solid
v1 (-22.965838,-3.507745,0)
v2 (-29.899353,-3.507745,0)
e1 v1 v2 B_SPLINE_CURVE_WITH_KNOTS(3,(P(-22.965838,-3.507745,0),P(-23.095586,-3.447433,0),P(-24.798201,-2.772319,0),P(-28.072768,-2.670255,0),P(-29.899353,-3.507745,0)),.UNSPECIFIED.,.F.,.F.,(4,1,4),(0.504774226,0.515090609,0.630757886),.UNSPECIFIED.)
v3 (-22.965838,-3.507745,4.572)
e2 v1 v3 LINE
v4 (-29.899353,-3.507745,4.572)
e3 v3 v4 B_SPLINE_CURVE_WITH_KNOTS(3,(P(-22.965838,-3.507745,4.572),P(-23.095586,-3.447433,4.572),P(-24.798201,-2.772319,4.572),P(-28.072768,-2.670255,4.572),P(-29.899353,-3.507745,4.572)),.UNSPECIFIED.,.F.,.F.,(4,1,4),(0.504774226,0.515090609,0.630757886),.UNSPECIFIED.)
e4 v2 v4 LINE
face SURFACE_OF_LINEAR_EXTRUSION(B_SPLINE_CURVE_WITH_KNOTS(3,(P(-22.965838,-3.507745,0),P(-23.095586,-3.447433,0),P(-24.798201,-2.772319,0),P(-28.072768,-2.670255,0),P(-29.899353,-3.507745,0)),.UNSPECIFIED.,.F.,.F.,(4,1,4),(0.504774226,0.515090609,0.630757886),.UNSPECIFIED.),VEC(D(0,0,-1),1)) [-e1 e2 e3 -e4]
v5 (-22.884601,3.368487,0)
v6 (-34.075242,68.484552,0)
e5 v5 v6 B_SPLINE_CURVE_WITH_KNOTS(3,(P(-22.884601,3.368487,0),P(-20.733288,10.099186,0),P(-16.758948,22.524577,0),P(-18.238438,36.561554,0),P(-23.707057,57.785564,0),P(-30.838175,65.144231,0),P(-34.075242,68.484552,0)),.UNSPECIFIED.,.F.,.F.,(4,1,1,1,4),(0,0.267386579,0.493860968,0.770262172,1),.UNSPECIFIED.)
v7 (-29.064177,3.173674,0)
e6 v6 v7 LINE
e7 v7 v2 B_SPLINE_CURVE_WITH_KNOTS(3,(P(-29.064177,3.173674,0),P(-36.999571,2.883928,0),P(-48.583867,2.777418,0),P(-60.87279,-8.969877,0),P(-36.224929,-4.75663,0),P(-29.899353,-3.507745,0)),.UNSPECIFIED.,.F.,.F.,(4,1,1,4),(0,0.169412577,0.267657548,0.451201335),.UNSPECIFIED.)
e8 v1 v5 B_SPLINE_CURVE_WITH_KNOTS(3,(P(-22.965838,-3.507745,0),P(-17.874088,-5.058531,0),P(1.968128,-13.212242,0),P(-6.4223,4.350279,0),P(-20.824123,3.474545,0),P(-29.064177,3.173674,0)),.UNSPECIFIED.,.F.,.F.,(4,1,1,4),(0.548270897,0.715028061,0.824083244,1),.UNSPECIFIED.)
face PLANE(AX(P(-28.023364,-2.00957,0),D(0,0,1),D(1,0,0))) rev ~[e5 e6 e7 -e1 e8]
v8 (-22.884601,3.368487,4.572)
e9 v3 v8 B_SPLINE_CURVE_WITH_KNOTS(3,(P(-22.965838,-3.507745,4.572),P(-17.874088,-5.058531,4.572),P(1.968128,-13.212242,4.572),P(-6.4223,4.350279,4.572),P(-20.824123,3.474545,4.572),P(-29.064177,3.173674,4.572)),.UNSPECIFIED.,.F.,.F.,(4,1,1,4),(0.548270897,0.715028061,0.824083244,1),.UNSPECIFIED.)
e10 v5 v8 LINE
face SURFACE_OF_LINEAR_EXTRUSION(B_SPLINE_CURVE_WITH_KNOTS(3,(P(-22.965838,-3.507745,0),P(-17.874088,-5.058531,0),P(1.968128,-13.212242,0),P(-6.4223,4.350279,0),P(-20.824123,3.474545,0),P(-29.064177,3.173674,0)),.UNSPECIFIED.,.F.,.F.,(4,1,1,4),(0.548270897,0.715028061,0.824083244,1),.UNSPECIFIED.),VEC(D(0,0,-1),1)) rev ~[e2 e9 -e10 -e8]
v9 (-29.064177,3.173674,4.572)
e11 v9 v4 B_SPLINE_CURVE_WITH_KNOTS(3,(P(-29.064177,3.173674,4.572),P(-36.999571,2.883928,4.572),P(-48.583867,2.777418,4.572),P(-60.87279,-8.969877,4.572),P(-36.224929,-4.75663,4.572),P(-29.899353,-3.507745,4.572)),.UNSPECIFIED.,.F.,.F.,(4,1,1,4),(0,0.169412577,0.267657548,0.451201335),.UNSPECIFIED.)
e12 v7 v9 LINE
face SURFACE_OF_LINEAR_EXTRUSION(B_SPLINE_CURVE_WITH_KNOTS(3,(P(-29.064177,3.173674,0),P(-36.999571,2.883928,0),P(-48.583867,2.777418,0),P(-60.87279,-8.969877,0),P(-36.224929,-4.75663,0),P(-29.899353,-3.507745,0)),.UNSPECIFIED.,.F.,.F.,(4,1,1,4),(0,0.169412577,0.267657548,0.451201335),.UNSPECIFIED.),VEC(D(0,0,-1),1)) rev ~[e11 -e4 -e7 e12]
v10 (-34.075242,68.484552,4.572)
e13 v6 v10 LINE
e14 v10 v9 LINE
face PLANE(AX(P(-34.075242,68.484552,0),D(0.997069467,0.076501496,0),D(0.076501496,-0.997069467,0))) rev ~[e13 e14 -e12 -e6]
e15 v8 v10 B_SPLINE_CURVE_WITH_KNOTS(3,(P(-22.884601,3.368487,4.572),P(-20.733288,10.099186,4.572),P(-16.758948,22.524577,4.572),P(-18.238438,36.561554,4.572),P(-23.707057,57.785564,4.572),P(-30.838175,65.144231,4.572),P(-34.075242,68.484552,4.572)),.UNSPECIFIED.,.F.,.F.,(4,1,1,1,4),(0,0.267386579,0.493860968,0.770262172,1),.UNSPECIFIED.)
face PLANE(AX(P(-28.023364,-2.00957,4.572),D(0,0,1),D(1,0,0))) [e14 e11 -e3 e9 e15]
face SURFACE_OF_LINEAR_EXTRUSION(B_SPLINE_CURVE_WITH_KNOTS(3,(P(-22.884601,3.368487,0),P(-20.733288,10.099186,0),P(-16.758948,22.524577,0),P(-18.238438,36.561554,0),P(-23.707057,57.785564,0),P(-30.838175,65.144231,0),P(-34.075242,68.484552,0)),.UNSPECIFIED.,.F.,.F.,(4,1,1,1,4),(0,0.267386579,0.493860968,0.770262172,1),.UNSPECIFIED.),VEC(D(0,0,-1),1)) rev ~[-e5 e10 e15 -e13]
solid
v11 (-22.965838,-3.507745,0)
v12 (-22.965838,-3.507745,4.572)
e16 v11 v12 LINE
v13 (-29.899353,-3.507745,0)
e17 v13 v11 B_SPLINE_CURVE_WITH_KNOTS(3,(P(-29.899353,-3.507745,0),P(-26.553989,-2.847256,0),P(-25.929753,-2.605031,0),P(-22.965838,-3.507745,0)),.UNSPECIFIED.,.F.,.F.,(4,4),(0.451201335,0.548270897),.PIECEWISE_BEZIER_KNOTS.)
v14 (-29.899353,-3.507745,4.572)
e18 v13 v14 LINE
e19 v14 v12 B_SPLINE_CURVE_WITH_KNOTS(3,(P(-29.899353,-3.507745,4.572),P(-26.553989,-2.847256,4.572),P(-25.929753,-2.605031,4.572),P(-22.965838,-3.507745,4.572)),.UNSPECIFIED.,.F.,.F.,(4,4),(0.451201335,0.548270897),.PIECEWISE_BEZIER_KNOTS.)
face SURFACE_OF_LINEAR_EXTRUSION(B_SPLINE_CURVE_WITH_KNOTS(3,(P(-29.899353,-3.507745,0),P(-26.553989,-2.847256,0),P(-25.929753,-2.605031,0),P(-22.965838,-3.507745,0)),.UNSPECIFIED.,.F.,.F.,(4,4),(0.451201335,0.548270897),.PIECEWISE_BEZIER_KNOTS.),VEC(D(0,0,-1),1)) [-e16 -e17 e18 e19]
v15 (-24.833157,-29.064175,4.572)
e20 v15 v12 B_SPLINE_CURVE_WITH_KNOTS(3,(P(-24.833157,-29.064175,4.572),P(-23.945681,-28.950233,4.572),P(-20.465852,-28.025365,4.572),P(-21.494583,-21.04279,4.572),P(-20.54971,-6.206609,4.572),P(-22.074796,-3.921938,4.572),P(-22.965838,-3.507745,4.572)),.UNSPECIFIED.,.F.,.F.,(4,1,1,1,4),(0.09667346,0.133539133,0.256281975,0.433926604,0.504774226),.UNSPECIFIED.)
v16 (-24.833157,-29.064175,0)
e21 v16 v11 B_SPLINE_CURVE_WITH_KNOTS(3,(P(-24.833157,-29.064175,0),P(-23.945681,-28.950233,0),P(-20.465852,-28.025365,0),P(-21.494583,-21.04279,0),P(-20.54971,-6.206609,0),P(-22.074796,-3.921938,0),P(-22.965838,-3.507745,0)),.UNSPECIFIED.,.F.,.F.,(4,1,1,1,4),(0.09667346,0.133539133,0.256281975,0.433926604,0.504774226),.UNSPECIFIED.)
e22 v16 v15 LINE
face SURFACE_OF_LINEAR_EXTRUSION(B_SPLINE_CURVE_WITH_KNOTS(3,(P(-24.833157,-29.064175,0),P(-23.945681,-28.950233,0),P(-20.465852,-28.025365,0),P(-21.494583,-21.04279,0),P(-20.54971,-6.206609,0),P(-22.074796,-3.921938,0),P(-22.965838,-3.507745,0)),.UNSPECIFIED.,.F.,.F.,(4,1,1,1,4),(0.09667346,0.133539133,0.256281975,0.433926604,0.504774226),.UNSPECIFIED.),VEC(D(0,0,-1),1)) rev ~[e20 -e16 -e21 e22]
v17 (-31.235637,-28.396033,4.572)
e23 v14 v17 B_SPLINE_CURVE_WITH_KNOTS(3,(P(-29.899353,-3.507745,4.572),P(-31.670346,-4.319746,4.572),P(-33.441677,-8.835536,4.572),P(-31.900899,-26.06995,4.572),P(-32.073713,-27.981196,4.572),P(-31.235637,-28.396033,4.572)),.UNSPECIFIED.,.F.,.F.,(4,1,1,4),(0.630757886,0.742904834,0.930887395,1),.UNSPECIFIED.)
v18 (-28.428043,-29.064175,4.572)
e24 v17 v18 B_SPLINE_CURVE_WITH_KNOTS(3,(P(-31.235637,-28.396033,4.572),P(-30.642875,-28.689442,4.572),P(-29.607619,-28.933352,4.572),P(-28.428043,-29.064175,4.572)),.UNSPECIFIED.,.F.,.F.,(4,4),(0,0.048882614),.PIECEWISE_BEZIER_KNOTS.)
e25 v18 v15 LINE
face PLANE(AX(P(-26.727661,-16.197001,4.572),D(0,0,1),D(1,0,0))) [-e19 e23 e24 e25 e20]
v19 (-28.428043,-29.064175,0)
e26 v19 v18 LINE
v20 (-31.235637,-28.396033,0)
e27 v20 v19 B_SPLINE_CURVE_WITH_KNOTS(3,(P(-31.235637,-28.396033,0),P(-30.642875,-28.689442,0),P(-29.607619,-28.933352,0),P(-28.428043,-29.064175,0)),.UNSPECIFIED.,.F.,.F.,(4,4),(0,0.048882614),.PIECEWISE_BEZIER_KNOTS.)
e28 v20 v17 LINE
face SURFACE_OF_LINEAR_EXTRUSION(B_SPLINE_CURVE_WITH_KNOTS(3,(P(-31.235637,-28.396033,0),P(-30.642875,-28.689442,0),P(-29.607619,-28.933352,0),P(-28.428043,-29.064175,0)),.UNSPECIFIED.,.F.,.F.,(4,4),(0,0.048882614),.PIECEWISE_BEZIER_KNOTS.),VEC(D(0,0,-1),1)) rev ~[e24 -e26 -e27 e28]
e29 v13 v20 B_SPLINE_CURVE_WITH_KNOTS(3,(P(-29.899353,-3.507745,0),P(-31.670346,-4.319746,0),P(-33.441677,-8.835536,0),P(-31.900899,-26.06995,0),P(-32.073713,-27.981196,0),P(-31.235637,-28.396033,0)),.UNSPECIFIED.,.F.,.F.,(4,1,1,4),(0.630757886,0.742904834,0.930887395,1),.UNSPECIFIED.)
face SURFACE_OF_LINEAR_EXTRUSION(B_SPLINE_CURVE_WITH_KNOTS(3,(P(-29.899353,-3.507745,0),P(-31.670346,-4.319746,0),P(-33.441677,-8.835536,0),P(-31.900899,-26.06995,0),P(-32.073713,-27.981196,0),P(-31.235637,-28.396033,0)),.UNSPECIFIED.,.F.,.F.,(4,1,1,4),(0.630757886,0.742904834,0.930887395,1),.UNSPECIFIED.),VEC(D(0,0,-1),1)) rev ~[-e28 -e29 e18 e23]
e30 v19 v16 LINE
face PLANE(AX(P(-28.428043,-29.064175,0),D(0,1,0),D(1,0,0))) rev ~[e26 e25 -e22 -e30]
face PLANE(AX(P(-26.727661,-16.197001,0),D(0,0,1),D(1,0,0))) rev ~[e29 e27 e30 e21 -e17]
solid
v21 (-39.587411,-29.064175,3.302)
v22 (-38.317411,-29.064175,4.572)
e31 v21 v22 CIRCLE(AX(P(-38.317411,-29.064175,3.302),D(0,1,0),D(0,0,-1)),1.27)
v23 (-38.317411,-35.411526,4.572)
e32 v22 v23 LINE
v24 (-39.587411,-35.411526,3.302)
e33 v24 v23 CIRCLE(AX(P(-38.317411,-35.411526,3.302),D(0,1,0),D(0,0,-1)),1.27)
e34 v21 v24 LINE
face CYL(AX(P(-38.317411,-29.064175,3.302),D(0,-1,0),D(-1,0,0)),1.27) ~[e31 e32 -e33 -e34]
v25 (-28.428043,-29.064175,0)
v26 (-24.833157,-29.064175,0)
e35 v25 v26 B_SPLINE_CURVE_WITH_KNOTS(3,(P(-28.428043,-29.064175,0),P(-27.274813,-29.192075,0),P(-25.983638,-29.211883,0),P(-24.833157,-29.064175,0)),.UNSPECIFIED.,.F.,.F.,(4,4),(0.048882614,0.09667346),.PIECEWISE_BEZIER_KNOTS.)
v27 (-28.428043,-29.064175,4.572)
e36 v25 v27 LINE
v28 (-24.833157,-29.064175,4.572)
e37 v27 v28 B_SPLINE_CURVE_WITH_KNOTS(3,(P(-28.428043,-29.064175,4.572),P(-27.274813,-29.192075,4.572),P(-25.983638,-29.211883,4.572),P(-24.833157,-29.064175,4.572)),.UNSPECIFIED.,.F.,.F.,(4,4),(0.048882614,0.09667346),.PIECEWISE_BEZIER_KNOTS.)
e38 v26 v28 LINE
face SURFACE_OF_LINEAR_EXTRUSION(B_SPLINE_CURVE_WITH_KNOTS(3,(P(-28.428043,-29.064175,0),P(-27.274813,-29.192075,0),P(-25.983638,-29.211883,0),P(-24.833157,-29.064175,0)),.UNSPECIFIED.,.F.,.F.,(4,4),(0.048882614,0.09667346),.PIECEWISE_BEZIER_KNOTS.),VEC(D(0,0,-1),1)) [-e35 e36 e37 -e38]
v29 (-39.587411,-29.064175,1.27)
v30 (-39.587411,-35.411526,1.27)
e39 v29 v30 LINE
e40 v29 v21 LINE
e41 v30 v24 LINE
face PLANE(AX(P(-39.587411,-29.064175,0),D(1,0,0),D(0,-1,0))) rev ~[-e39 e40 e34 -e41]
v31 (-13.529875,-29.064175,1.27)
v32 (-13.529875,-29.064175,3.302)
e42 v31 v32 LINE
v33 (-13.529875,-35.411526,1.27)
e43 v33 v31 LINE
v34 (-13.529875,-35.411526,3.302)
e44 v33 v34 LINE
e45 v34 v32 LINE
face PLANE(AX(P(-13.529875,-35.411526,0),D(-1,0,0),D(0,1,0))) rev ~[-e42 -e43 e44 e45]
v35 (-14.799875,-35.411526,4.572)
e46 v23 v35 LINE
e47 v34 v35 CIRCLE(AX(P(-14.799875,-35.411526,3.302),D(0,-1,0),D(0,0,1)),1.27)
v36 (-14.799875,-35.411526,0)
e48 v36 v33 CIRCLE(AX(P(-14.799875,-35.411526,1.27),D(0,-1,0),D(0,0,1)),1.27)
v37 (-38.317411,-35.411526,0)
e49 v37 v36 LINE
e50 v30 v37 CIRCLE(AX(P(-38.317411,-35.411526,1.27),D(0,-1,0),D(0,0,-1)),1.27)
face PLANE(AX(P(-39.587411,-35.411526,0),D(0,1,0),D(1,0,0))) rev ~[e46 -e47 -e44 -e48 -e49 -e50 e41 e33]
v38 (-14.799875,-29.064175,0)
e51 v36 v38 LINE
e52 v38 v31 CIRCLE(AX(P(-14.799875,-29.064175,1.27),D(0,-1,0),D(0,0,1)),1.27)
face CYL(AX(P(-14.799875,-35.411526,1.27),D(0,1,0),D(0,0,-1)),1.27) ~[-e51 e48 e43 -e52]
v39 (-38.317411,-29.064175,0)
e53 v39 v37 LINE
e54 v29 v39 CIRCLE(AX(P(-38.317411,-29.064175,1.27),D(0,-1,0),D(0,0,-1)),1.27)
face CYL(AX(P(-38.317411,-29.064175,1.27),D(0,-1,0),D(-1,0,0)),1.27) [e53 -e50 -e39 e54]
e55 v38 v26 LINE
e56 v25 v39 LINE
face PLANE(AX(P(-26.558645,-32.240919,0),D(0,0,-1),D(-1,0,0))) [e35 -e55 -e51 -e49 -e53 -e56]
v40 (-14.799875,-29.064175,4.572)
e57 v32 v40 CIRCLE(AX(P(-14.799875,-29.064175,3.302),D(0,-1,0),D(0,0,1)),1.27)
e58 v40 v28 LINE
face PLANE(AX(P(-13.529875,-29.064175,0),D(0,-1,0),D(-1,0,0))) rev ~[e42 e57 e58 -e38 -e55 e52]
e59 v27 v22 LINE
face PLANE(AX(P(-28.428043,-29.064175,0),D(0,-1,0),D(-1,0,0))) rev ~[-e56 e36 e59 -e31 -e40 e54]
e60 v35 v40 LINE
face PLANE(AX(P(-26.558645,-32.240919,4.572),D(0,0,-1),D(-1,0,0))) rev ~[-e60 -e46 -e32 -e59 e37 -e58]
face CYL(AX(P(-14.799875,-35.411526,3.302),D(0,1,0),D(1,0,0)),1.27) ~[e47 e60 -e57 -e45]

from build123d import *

# Parameters (mm, degrees)
F1_DEPTH = 4.572
F2_R     = 1.27
F3_R     = 1.27
F4_R     = 1.27
F5_R     = 1.27


with BuildPart() as f1:
    # F0 (on Top) → F1 (new body)
    with BuildSketch(Plane.XY):
        with BuildLine():
            add(Edge.make_bspline(
                [(-29.8993531615, -3.5077452194), (-31.6703462632, -4.3197464152), (-33.4416768807, -8.8355358115), (-31.9008991214, -26.0699501287), (-32.073712776, -27.9811963987), (-31.2356371433, -28.3960327506)],
                knots=[0.6307578864, 0.6307578864, 0.6307578864, 0.6307578864, 0.7429048342, 0.9308873949, 1, 1, 1, 1], degree=3))
            add(Edge.make_bspline(
                [(-31.2356371433, -28.3960327506), (-30.6428751172, -28.6894421123), (-29.6076188044, -28.9333524282), (-28.4280432172, -29.0641747415)],
                knots=[0, 0, 0, 0, 0.0488826142, 0.0488826142, 0.0488826142, 0.0488826142], degree=3))
            Line((-28.4280432172, -29.0641747415), (-24.8331572694, -29.0641747415))
            add(Edge.make_bspline(
                [(-24.8331572694, -29.0641747415), (-23.9456810218, -28.9502333326), (-20.4658515137, -28.0253654937), (-21.4945827069, -21.0427899664), (-20.5497100233, -6.2066091766), (-22.0747955225, -3.9219376818), (-22.9658381019, -3.5077452194)],
                knots=[0.0966734598, 0.0966734598, 0.0966734598, 0.0966734598, 0.1335391331, 0.2562819752, 0.4339266036, 0.5047742263, 0.5047742263, 0.5047742263, 0.5047742263], degree=3))
            add(Edge.make_bspline(
                [(-29.8993531615, -3.5077452194), (-26.5539886397, -2.8472558093), (-25.9297526703, -2.6050307792), (-22.9658381019, -3.5077452194)],
                knots=[0.4512013353, 0.4512013353, 0.4512013353, 0.4512013353, 0.548270897, 0.548270897, 0.548270897, 0.548270897], degree=3))
        make_face()
    extrude(amount=F1_DEPTH)


with BuildPart() as f1b:
    # F0 (on Top) → F1, piece 2 (new body)
    with BuildSketch(Plane.XY):
        with BuildLine():
            add(Edge.make_bspline(
                [(-28.4280432172, -29.0641747415), (-27.2748128564, -29.1920752043), (-25.9836378271, -29.2118827799), (-24.8331572694, -29.0641747415)],
                knots=[0.0488826142, 0.0488826142, 0.0488826142, 0.0488826142, 0.0966734598, 0.0966734598, 0.0966734598, 0.0966734598], degree=3))
            Line((-28.4280432172, -29.0641747415), (-39.5874110982, -29.0641747415))
            Line((-39.5874110982, -29.0641747415), (-39.5874110982, -35.4115255177))
            Line((-39.5874110982, -35.4115255177), (-13.5298753157, -35.4115255177))
            Line((-13.5298753157, -35.4115255177), (-13.5298753157, -29.0641747415))
            Line((-13.5298753157, -29.0641747415), (-24.8331572694, -29.0641747415))
        make_face()
    extrude(amount=F1_DEPTH)

    # F2
    f2_edges = [f1b.edges().sort_by_distance(p)[0] for p in [
        (-39.587411, -32.23785, 4.572),
    ]]
    fillet(f2_edges, radius=F2_R)

    # F3
    f3_edges = [f1b.edges().sort_by_distance(p)[0] for p in [
        (-39.587411, -32.23785, 0),
    ]]
    fillet(f3_edges, radius=F3_R)

    # F4
    f4_edges = [f1b.edges().sort_by_distance(p)[0] for p in [
        (-13.529875, -32.23785, 0),
    ]]
    fillet(f4_edges, radius=F4_R)

    # F5
    f5_edges = [f1b.edges().sort_by_distance(p)[0] for p in [
        (-13.529875, -32.23785, 4.572),
    ]]
    fillet(f5_edges, radius=F5_R)


with BuildPart() as f1c:
    # F0 (on Top) → F1, piece 3 (new body)
    with BuildSketch(Plane.XY):
        with BuildLine():
            add(Edge.make_bspline(
                [(-29.0641766042, 3.1736744568), (-36.9995706334, 2.8839279058), (-48.5838670621, 2.7774177029), (-60.872789795, -8.9698768638), (-36.2249289881, -4.7566303017), (-29.8993531615, -3.5077452194)],
                knots=[0, 0, 0, 0, 0.1694125769, 0.2676575484, 0.4512013353, 0.4512013353, 0.4512013353, 0.4512013353], degree=3))
            add(Edge.make_bspline(
                [(-22.9658381019, -3.5077452194), (-23.0955860892, -3.4474331315), (-24.7982012469, -2.7723188561), (-28.0727680061, -2.67025504), (-29.8993531615, -3.5077452194)],
                knots=[0.5047742263, 0.5047742263, 0.5047742263, 0.5047742263, 0.5150906092, 0.6307578864, 0.6307578864, 0.6307578864, 0.6307578864], degree=3))
            add(Edge.make_bspline(
                [(-22.9658381019, -3.5077452194), (-17.8740876083, -5.0585310435), (1.968128388, -13.2122424462), (-5.6130342206, 2.6563547922), (-16.6332168416, 3.4628720663), (-22.8846012587, 3.3684871276)],
                knots=[0.548270897, 0.548270897, 0.548270897, 0.548270897, 0.7150280613, 0.824083244, 0.9564302387, 0.9564302387, 0.9564302387, 0.9564302387], degree=3))
            add(Edge.make_bspline(
                [(-22.8846012587, 3.3684871276), (-24.942610411, 3.3374147995), (-27.023340973, 3.2481918762), (-29.0641766042, 3.1736744568)],
                knots=[0.9564302387, 0.9564302387, 0.9564302387, 0.9564302387, 1, 1, 1, 1], degree=3))
        make_face()
        with BuildLine():
            Line((-34.0752415359, 68.4845522046), (-29.0641766042, 3.1736744568))
            add(Edge.make_bspline(
                [(-22.8846012587, 3.3684871276), (-24.942610411, 3.3374147995), (-27.023340973, 3.2481918762), (-29.0641766042, 3.1736744568)],
                knots=[0.9564302387, 0.9564302387, 0.9564302387, 0.9564302387, 1, 1, 1, 1], degree=3))
            add(Edge.make_bspline(
                [(-22.8846012587, 3.3684871276), (-20.7332880928, 10.0991858385), (-16.7589477096, 22.5245770204), (-18.2384375016, 36.5615536627), (-23.7070572199, 57.7855641977), (-30.8381753552, 65.1442313261), (-34.0752415359, 68.4845522046)],
                knots=[0, 0, 0, 0, 0.2673865788, 0.4938609679, 0.7702621718, 1, 1, 1, 1], degree=3))
        make_face()
    extrude(amount=F1_DEPTH)


solid = Compound([f1.part, f1b.part, f1c.part])
